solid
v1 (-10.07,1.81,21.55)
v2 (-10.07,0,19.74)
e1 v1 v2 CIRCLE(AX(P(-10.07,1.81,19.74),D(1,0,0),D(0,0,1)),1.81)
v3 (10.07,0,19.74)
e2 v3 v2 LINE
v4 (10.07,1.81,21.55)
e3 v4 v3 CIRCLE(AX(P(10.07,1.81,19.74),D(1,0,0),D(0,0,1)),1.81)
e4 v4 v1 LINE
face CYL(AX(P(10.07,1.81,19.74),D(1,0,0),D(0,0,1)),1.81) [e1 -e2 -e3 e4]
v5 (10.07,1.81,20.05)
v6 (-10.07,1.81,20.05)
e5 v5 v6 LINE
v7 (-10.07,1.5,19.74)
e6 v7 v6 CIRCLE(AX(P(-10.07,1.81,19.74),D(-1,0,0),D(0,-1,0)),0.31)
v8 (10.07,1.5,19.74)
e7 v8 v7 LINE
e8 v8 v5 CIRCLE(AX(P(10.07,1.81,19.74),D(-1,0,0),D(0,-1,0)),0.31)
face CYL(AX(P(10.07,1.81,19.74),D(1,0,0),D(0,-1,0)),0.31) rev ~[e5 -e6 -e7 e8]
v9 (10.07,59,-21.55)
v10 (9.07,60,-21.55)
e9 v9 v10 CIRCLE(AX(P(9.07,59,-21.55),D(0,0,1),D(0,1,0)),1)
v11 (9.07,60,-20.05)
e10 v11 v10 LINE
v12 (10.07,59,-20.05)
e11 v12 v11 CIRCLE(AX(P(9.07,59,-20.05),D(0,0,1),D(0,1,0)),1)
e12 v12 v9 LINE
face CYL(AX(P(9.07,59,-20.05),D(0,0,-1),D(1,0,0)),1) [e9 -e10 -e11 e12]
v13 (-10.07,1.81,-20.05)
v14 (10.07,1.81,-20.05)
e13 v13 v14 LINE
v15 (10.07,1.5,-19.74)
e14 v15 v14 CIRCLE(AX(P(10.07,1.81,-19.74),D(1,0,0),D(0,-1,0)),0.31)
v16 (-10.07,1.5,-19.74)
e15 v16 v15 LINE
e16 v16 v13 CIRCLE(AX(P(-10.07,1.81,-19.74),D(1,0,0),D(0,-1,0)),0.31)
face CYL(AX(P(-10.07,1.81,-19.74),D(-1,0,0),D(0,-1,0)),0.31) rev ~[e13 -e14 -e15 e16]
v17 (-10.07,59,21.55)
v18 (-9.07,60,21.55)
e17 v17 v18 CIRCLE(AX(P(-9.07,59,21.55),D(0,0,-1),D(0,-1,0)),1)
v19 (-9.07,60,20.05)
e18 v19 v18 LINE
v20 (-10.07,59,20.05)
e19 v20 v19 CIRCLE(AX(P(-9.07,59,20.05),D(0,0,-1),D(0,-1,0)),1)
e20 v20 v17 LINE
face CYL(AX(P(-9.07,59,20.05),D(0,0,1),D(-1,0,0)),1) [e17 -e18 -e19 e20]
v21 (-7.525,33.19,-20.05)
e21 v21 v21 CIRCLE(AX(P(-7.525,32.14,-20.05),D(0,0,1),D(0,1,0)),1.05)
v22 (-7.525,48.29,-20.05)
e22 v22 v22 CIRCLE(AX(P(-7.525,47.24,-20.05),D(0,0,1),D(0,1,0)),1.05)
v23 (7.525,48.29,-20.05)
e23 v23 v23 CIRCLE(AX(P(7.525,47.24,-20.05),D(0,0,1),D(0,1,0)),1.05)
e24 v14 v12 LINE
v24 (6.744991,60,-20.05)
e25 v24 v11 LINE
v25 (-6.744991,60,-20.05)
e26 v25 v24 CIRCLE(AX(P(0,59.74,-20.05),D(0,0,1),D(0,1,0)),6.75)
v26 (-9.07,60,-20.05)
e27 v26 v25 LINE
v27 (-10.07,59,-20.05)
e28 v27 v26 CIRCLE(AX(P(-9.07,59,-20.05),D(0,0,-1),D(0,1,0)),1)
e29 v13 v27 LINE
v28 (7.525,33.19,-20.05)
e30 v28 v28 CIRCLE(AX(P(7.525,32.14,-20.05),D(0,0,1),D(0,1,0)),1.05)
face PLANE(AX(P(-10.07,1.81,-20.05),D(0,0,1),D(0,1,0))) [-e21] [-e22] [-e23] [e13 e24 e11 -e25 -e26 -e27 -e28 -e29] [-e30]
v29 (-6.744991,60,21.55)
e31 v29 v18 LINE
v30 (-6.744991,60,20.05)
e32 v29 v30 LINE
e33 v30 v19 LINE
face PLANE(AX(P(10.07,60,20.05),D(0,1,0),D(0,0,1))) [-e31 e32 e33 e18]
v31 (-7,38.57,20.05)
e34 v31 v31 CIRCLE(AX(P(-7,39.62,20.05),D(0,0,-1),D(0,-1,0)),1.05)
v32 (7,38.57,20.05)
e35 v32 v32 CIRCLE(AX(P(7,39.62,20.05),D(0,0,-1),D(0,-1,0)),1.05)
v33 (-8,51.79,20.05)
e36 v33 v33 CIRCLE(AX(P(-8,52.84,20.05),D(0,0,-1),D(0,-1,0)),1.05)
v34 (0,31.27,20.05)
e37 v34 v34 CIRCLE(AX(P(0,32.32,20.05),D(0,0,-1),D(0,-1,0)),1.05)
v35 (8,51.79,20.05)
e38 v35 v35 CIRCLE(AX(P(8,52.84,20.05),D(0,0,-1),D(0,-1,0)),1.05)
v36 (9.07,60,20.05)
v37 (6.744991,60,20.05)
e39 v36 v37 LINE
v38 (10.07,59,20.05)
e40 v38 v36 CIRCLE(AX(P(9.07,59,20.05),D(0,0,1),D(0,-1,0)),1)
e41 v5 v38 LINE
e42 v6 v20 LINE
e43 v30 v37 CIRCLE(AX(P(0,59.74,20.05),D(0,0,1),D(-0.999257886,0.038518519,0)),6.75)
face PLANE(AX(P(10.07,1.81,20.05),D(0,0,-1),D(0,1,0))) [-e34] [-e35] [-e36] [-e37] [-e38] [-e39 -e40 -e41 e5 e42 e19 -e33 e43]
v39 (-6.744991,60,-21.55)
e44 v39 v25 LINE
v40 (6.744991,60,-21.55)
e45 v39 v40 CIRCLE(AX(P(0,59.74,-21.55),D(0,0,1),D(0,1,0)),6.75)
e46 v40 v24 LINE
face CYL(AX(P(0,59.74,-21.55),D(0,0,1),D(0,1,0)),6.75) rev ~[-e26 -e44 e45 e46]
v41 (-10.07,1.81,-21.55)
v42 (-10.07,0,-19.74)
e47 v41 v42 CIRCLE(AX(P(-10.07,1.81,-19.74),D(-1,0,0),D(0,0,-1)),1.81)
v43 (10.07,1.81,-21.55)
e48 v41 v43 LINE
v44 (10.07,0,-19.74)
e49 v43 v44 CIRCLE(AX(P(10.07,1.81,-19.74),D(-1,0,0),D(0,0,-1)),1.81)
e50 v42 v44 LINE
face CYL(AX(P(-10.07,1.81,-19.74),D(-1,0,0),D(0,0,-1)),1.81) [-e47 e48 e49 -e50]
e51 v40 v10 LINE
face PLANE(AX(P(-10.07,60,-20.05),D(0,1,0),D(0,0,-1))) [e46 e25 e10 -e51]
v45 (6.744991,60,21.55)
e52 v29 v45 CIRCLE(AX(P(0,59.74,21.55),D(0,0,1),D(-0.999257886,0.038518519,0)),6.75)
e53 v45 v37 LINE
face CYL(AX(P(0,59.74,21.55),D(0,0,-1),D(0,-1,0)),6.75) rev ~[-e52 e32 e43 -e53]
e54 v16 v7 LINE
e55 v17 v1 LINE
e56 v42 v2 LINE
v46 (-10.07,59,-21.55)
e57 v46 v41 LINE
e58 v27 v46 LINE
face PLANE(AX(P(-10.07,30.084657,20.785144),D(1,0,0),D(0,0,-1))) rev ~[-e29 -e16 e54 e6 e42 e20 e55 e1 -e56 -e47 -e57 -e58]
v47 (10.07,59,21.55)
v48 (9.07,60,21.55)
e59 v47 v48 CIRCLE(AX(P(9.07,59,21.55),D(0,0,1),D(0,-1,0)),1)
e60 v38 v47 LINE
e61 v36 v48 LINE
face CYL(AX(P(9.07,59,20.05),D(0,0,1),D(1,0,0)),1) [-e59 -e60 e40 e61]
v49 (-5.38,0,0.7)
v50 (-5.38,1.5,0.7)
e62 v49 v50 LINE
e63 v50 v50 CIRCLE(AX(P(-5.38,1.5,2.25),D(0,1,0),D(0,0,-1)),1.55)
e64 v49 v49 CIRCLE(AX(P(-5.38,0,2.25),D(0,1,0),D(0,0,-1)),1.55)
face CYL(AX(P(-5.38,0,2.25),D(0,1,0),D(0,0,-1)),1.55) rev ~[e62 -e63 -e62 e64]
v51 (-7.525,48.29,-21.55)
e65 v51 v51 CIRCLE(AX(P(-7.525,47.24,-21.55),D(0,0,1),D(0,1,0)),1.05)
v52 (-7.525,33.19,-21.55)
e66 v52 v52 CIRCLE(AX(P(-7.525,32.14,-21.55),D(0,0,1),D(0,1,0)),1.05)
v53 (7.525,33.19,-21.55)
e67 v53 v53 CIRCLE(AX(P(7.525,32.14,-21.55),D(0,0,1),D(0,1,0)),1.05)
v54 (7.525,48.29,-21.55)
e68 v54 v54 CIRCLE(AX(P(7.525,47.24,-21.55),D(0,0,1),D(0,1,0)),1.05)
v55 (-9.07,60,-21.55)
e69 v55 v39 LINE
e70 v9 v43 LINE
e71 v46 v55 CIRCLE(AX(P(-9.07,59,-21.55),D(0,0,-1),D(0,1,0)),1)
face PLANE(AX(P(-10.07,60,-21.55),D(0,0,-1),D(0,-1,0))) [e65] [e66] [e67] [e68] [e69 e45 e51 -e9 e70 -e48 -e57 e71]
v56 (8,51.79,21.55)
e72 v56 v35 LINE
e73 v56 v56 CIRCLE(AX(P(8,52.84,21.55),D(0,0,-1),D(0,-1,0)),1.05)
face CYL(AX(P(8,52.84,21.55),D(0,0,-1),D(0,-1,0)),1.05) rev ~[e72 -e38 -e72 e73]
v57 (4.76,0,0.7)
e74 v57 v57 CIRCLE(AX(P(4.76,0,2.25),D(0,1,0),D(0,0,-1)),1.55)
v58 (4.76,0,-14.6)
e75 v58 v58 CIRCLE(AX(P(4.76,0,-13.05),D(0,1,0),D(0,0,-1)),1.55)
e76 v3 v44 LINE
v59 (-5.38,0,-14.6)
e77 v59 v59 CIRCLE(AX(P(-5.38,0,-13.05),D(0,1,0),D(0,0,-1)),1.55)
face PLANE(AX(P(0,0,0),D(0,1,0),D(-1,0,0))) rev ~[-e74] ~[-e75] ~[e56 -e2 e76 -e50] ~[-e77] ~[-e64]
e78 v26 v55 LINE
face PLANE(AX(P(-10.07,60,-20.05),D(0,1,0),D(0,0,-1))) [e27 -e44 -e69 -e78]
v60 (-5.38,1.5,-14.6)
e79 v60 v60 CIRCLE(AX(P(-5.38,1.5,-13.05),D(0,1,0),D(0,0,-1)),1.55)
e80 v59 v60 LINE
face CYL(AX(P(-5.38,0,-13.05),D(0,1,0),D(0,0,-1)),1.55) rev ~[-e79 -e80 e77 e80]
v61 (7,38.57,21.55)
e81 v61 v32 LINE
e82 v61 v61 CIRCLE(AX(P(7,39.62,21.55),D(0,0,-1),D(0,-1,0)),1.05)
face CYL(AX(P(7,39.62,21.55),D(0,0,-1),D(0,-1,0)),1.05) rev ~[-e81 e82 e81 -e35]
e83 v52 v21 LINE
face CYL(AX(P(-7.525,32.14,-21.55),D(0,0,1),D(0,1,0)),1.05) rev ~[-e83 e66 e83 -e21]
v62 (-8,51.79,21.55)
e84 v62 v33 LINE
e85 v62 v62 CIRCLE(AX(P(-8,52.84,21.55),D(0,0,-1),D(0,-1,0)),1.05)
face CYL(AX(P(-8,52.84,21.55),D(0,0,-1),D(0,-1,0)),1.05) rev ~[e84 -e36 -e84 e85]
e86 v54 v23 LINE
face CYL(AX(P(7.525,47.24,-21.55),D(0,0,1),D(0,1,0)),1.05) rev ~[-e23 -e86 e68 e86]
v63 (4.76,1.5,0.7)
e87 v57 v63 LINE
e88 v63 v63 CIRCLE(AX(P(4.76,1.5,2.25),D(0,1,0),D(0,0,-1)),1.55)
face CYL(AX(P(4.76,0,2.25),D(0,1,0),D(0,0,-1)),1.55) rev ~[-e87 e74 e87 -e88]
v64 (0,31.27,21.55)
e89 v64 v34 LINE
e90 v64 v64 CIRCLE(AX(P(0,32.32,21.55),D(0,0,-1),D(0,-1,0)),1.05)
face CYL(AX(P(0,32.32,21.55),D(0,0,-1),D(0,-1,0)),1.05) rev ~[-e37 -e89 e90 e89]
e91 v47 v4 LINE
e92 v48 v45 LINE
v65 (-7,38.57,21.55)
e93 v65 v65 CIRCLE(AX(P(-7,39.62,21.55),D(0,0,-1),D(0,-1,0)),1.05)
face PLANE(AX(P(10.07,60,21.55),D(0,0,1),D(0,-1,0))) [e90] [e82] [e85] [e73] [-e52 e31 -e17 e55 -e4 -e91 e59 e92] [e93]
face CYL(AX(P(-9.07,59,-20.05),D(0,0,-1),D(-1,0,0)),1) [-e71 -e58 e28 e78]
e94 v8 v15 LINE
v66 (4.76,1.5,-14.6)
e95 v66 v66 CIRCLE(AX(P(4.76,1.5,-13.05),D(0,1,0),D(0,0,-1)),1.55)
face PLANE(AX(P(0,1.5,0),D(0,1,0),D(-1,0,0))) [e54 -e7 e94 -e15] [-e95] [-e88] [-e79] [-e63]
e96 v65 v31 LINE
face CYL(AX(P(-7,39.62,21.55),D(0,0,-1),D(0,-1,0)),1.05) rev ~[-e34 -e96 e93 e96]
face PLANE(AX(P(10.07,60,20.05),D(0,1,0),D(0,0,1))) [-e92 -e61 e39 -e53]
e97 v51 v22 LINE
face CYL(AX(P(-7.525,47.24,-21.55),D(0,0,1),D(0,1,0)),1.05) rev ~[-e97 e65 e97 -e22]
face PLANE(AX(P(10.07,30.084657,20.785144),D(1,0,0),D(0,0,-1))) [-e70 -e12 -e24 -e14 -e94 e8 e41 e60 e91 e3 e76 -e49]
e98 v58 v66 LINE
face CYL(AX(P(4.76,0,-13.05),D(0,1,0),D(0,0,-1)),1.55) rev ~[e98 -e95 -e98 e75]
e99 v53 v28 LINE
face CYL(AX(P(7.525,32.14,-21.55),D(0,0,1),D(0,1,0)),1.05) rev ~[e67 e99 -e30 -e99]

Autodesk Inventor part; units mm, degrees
ref_plane "YZ Plane" through (0, 0, 0) normal (1, 0, 0) x (0, 1, 0)
ref_plane "XZ Plane" through (0, 0, 0) normal (0, 1, 0) x (-1, 0, 0)
ref_plane "XY Plane" through (0, 0, 0) normal (0, 0, 1) x (1, 0, 0)
sketch "Sketch1" plane through (0, 0, 0) normal (0, 1, 0) x (-1, 0, 0)
  line L0 (10.07, 20.05) -> (-10.07, 20.05)
  line L1 (-10.07, 20.05) -> (-10.07, -20.05)
  line L2 (-10.07, -20.05) -> (10.07, -20.05)
  line L3 (10.07, -20.05) -> (10.07, 20.05)
  point P0 (0, 0)
  dimension "d0" = 40.1
  dimension "d1" = 20.14
  dimension "d2" = 10.07
  dimension "d3" = 20.05
extrude "Plate1" add sketch "Sketch1" along normal blind 1.5
sketch "Sketch2" plane through (10.07, 0, 21.55) normal (0, 0, -1) x (-1, 0, 0)
  line L0 (20.14, 0) -> (0, 0)
  line L1 (0, 0) -> (0, 60)
  line L2 (0, 60) -> (20.14, 60)
  line L3 (20.14, 60) -> (20.14, 0)
edge flange "Flange1" height 60 angle 90 thickness 1.5 bend radius 0.31 thickness toward (0, 0, -1) relief tear relief width 1.5 relief depth 0.75 corner gap 0.31 corner form 0 edges at (0, 1.5, 20.05) (0, 1.5, -20.05) wall of the first edge with corners at (-10.07, 0, 21.55) (10.07, 0, 21.55) (10.07, 60, 21.55) (-10.07, 60, 21.55)
bend "Bend1"
corner "Corner1"
sketch "Sketch15" plane through (10.07, 60, -21.55) normal (0, 0, -1) x (-1, 0, 0)
  circle A0 centre (2.545, -12.76) radius 0.7835
  circle A1 centre (17.595, -12.76) radius 0.7835
  circle A2 centre (2.545, -27.86) radius 0.7835
  circle A3 centre (17.595, -27.86) radius 0.7835
  point P0 (10.07, -60)
hole "Hole9" at (7.525, 47.24, -21.55) at (-7.525, 47.24, -21.55) at (7.525, 32.14, -21.55) at (-7.525, 32.14, -21.55) direction (0, 0, 1) diameter 2.1 depth 1.5
sketch "Sketch16" plane through (-10.07, 60, 21.55) normal (0, 0, 1) x (1, 0, 0)
  circle A0 centre (18.07, -7.16) radius 0.7835
  circle A1 centre (2.07, -7.16) radius 0.7835
  circle A2 centre (3.07, -20.38) radius 0.7835
  circle A3 centre (17.07, -20.38) radius 0.7835
  circle A4 centre (10.07, -27.68) radius 0.7835
  point P0 (10.07, -60)
hole "Hole10" at (-8, 52.84, 21.55) at (8, 52.84, 21.55) at (-7, 39.62, 21.55) at (7, 39.62, 21.55) at (0, 32.32, 21.55) direction (0, 0, -1) diameter 2.1 depth 1.5
sketch "Sketch17" plane through (-10.07, 60, 21.55) normal (0, 0, 1) x (1, 0, 0)
  point P0 (10.07, -60)
sketch "Sketch18" plane through (-10.07, 60, 21.55) normal (0, 0, 1) x (1, 0, 0)
  point P0 (10.07, -60)
sketch "Sketch19" plane through (-10.07, 60, 21.55) normal (0, 0, 1) x (1, 0, 0)
  circle A0 centre (10.07, -0.26) radius 6
  point P0 (10.07, -60)
sketch "Sketch20" plane through (10.07, 60, -21.55) normal (0, 0, -1) x (-1, 0, 0)
  circle A0 centre (10.07, -0.26) radius 6
  point P0 (10.07, -60)
sketch "Sketch21" plane through (0, 0, 0) normal (0, -1, 0) x (1, 0, 0)
  circle A0 centre (4.76, 2.25) radius 1.5
  circle A1 centre (4.76, -13.05) radius 1.5
  circle A2 centre (-5.38, -13.05) radius 1.5
  circle A3 centre (-5.38, 2.25) radius 1.5
  point P0 (0, 0)
fillet "Corner Round1" radius 1 4 edges at (-10.07, 60, 20.8) (-10.07, 60, -20.8) (10.07, 60, -20.8) (10.07, 60, 20.8)
hole "Hole11" at (-5.38, 0, -13.05) at (4.76, 0, -13.05) at (-5.38, 0, 2.25) at (4.76, 0, 2.25) direction (0, 1, 0) diameter 3.1 depth 1.5
hole "Hole12" at (0, 59.74, 21.55) direction (0, 0, -1) diameter 13.5 depth 1.5
hole "Hole13" at (0, 59.74, -21.55) direction (0, 0, 1) diameter 13.5 depth 1.5
equation "\"d96\" = Thickness"
equation "\"d103\" = Thickness"
equation "\"d117\" = Thickness"
equation "\"d124\" = Thickness"
equation "\"d131\" = Thickness"
equation "\"d4\" = Thickness"
equation "\"d5\" = BendReliefWidth"
equation "\"d6\" = BendReliefDepth"
equation "\"d7\" = MinimumRemnant"
equation "\"d8\" = TransitionRadius"
equation "\"d11\" = BendRadius"
equation "\"d12\" = CornerReliefSize"
equation "\"d13\" = GapSize"
equation "\"d14\" = JacobiRadiusSize"
equation "\"BendReliefWidth\" = Thickness"
equation "\"BendReliefDepth\" = 0.5 * Thickness"
equation "\"CornerReliefSize\" = 4 * Thickness"
equation "\"MinimumRemnant\" = 2 * Thickness"
equation "\"TransitionRadius\" = BendRadius"
equation "\"JacobiRadiusSize\" = BendRadius"
equation "\"GapSize\" = Thickness"
equation "\"Thickness\" = 1.5"
equation "\"BendRadius\" = 0.31"
properties part number "axis_25_top_frame" material "Aluminum 6061-AHC"
